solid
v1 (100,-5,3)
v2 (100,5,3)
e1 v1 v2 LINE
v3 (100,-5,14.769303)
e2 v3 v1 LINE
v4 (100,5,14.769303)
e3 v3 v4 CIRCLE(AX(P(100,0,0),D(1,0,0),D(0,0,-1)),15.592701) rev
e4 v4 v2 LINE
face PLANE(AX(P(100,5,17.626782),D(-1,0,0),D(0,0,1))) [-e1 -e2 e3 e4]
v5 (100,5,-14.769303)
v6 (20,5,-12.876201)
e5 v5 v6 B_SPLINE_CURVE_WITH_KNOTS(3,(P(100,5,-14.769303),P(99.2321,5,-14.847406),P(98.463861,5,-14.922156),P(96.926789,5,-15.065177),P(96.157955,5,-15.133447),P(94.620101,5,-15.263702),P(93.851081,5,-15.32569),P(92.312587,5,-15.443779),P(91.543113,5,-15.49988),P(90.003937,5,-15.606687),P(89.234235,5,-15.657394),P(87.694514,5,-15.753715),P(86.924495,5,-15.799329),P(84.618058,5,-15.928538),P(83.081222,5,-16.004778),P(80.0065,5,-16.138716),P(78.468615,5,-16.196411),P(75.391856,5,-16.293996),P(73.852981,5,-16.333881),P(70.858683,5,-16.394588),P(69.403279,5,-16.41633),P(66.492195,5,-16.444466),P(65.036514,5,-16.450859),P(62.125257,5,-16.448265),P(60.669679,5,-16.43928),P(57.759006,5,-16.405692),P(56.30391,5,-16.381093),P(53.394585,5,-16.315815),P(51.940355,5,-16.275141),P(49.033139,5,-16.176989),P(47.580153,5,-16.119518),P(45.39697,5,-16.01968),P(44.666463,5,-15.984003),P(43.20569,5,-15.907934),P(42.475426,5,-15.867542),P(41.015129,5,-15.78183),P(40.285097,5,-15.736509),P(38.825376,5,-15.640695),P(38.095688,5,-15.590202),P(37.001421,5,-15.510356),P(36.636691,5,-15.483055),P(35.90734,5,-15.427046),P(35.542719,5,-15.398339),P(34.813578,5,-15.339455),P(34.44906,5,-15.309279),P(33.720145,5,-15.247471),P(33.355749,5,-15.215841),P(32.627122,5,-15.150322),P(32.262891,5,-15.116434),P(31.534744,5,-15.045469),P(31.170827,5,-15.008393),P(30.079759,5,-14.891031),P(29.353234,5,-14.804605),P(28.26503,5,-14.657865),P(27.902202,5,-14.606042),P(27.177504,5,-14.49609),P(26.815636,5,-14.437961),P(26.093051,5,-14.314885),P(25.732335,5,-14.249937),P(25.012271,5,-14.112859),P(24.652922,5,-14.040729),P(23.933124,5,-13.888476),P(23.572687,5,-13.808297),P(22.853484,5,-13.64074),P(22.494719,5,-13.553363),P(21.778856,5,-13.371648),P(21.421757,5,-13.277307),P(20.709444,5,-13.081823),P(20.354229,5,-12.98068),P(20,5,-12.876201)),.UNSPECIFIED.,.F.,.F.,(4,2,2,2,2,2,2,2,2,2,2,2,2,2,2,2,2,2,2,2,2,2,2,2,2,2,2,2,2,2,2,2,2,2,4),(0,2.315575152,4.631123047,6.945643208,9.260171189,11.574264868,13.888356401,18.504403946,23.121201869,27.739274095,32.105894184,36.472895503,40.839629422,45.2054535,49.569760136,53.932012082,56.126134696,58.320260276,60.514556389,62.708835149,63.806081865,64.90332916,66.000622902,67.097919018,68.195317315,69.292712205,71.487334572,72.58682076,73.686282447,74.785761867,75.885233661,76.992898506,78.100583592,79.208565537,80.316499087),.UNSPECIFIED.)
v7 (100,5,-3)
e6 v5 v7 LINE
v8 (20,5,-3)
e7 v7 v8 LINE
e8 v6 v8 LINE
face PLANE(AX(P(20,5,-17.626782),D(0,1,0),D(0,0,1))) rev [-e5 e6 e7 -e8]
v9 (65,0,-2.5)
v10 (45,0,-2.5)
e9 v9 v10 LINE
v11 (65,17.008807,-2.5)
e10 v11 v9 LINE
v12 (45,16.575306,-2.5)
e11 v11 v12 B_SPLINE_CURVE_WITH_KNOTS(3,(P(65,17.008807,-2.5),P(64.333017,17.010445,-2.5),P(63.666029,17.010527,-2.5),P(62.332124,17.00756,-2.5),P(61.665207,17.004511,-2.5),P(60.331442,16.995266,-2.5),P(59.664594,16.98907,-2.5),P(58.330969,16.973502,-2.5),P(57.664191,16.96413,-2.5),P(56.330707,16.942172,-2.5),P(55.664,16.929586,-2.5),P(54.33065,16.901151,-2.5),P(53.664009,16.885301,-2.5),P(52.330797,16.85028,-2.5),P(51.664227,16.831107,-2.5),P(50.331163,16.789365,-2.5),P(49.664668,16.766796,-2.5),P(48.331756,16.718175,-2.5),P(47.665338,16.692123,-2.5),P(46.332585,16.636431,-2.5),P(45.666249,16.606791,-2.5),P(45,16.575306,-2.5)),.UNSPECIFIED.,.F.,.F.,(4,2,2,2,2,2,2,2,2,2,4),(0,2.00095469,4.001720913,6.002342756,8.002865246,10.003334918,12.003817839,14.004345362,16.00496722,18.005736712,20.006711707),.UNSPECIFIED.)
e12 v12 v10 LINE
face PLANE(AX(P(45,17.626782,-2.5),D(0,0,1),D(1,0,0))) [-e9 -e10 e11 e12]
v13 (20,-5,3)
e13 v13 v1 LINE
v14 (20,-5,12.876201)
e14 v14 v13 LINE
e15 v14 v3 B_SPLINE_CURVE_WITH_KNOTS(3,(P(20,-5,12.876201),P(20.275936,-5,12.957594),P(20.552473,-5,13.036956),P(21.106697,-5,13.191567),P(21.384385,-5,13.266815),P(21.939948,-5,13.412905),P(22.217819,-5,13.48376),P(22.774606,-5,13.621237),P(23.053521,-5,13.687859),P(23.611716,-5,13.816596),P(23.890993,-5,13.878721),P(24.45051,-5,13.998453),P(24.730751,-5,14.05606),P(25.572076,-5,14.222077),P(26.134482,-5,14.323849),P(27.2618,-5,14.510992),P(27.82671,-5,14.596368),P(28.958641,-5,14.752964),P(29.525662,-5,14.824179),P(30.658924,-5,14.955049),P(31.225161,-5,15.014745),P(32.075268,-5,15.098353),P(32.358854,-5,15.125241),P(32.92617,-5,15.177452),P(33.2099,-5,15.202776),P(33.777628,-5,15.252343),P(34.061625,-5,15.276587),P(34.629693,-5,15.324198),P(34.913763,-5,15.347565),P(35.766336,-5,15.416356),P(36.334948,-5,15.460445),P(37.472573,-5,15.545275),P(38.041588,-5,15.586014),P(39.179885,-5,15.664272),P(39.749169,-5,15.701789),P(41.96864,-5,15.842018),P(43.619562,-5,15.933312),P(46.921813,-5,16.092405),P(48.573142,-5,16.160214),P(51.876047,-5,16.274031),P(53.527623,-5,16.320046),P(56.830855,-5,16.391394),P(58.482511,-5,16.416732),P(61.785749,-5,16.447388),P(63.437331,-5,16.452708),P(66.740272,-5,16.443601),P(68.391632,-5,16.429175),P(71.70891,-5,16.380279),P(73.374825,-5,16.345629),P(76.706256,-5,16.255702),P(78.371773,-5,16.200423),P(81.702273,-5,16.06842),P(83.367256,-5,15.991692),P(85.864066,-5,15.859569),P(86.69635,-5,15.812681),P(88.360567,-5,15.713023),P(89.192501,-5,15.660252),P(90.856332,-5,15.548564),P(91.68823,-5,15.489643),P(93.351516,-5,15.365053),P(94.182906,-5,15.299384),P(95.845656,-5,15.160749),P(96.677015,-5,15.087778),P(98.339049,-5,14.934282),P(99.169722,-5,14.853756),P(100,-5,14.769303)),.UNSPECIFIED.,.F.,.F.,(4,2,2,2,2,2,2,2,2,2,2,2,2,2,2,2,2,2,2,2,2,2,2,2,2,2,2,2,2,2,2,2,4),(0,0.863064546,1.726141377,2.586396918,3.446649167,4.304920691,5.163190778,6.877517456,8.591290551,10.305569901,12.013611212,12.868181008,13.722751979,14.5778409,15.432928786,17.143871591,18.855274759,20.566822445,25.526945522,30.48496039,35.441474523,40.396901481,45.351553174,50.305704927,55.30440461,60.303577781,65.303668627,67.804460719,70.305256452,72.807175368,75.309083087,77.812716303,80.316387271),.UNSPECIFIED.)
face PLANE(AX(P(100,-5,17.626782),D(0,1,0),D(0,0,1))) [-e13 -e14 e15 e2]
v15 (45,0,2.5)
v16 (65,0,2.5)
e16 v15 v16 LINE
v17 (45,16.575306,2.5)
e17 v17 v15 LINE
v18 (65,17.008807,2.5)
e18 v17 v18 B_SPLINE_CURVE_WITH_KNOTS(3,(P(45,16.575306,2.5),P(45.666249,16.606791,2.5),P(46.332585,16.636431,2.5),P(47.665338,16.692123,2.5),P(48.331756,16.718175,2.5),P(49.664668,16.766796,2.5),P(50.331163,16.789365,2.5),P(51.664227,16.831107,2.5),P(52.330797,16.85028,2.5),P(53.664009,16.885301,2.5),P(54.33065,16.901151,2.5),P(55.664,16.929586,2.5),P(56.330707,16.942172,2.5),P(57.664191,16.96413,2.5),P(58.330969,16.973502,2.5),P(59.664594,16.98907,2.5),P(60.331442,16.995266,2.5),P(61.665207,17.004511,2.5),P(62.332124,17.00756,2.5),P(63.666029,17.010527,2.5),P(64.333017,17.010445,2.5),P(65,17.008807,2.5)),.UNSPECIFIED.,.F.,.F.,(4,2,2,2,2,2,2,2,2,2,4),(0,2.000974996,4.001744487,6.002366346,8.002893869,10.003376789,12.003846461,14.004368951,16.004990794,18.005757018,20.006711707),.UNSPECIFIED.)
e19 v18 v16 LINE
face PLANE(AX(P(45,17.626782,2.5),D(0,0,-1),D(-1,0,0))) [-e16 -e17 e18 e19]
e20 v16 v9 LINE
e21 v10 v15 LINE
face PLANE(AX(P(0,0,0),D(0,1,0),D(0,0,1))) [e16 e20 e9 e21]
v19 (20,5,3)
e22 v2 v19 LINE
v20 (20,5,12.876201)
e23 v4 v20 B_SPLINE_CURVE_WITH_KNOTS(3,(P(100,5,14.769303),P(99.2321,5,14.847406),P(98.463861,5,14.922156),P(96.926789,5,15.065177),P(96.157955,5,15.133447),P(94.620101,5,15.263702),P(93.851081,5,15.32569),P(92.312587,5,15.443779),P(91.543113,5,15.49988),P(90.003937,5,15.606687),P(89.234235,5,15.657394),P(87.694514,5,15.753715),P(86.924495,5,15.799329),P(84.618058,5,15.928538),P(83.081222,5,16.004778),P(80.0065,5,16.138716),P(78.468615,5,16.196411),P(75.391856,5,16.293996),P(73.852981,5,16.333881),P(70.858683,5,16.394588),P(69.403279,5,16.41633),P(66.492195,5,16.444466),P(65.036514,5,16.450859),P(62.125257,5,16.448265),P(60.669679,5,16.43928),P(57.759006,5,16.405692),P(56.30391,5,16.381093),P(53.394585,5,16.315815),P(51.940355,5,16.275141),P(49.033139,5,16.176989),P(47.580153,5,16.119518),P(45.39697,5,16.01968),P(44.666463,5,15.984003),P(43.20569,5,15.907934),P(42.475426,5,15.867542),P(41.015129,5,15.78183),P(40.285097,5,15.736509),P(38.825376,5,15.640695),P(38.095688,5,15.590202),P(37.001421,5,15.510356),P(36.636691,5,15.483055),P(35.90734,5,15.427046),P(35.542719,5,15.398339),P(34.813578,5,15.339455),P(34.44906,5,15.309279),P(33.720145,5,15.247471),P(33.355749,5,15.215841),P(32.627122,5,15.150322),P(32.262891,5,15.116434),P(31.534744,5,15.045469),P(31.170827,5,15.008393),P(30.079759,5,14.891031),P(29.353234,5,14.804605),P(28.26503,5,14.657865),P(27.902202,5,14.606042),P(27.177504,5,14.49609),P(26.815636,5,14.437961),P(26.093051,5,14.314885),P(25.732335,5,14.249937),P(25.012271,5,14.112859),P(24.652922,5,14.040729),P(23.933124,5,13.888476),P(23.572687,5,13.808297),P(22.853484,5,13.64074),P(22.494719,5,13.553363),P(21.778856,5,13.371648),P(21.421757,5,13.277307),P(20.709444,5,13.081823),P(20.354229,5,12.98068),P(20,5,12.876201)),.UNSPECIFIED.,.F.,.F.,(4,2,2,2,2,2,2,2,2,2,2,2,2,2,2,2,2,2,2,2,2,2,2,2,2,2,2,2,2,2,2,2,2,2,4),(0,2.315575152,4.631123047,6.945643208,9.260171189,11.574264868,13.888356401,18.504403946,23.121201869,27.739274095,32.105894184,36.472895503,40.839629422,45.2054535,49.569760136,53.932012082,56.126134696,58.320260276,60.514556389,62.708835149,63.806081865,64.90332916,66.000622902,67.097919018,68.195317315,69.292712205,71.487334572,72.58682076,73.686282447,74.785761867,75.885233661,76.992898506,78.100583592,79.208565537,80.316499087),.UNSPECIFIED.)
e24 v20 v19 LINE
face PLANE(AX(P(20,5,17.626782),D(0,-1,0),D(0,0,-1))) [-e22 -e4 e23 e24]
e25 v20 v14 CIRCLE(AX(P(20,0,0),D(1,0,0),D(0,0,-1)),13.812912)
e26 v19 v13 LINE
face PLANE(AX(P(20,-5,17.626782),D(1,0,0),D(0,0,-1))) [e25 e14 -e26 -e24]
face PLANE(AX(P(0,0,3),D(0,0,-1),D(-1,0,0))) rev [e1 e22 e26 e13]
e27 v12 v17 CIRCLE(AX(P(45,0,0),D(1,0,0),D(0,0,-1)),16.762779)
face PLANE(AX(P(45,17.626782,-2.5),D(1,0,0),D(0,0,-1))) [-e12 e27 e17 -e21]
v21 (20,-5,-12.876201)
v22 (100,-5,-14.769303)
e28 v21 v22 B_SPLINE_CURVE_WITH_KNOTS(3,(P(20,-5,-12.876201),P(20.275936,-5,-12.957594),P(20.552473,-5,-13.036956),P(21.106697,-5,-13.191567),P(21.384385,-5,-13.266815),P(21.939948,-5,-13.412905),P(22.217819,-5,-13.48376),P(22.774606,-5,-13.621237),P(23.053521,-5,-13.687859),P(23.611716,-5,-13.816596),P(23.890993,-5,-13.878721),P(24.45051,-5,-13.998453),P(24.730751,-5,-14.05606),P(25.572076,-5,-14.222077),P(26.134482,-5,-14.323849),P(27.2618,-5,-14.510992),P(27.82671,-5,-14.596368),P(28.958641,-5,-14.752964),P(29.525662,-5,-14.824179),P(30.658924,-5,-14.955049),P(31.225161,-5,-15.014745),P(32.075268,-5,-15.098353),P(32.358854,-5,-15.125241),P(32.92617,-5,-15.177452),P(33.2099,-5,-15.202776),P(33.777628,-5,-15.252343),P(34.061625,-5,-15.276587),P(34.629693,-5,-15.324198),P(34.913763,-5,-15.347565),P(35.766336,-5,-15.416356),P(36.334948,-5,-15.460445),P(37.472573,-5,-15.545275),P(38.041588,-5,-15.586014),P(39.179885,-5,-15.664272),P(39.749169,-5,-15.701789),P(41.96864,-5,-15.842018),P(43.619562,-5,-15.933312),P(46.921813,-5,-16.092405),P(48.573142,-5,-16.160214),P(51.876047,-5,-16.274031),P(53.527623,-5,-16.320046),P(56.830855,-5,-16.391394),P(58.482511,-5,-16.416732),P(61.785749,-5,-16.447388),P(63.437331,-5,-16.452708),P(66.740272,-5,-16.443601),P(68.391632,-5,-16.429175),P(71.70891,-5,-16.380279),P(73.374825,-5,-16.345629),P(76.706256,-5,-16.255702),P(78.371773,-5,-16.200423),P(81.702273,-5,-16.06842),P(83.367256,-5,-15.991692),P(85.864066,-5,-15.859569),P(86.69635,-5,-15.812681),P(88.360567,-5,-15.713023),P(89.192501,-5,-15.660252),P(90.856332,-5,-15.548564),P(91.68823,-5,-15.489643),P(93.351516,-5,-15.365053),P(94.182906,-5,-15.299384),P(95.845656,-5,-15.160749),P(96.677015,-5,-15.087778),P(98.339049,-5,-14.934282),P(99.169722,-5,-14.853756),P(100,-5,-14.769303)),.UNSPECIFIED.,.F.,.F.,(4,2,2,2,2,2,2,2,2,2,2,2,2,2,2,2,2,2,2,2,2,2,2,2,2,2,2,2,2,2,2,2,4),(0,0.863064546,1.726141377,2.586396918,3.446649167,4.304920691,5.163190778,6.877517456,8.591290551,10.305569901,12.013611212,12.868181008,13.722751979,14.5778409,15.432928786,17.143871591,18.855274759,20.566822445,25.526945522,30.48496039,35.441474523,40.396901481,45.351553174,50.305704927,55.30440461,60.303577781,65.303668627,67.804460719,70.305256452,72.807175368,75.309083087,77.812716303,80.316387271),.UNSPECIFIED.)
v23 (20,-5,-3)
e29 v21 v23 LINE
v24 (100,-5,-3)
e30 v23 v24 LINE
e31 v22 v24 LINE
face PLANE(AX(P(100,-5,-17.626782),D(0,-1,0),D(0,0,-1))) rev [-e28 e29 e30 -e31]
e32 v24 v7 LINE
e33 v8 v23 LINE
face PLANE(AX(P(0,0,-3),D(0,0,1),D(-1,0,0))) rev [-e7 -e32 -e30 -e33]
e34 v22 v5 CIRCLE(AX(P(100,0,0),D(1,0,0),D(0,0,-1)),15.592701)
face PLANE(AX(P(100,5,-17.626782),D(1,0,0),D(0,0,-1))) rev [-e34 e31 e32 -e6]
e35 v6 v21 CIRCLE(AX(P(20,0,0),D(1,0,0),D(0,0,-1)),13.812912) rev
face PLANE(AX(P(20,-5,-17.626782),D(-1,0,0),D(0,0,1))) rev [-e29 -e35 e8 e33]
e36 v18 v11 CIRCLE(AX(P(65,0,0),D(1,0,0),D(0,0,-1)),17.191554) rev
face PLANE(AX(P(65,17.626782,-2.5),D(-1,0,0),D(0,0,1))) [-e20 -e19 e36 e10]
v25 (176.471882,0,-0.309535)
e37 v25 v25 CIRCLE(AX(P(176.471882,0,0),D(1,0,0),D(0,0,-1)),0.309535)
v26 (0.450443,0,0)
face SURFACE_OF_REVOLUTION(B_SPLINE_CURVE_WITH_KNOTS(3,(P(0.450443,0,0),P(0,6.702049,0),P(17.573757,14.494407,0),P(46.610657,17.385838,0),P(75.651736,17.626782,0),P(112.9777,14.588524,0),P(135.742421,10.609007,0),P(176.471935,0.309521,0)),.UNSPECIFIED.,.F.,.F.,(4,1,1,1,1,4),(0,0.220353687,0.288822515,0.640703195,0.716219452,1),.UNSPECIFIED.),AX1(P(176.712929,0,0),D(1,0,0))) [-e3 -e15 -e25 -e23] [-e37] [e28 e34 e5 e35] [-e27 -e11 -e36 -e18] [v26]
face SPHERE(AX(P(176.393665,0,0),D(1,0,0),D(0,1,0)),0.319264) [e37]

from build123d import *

# Parameters (mm, degrees)
ESQUISSE2_W             = 80
ESQUISSE2_H             = 10
ENL_V_MAT_EXTRU_1_DEPTH = 179.691922833
ESQUISSE3_W             = 20
ESQUISSE3_H             = 5
ENL_V_MAT_EXTRU_2_DEPTH = 179.307729192


# Read off the part's stored shape, not the designer's step: Révolution1
with BuildPart() as part:
    # Révolution1 outline → Révolution1 (revolve)
    with BuildSketch(Plane.YX):
        with BuildLine():
            Line((0, 176.471881523), (0, 0.450442526))
            add(Edge.make_bspline(
                [(0, 0.450442526), (0.103361961, 0.443495603), (0.206543876, 0.439844859), (0.309534668, 0.439429886)],
                knots=[0, 0, 0, 0, 0.003398392, 0.003398392, 0.003398392, 0.003398392], degree=3))
            Line((0.309534668, 0.439429886), (0.309534507, 176.471881524))
            Line((0.309534507, 176.471881524), (0, 176.471881523))
        make_face()
        with BuildLine():
            Line((0.309534512, 176.471881525), (0.309534668, 0.439429886))
            add(Edge.make_bspline(
                [(0.309534668, 0.439429886), (6.884526451, 0.412937715), (14.509743766, 17.727772952), (16.667676996, 39.398599443), (17.192832586, 53.387091856), (17.192832592, 63.948829317)],
                knots=[0.003398392, 0.003398392, 0.003398392, 0.003398392, 0.220353687, 0.288822515, 0.48156816, 0.48156816, 0.48156816, 0.48156816], degree=3))
            add(Edge.make_bspline(
                [(17.192832592, 63.948829317), (17.192832597, 72.668831581), (16.803343845, 85.767940858), (14.588524885, 112.977693153), (10.609009478, 135.742405432), (0.309534512, 176.471881525)],
                knots=[0.48156816, 0.48156816, 0.48156816, 0.48156816, 0.640703195, 0.716219452, 0.999999875, 0.999999875, 0.999999875, 0.999999875], degree=3))
        make_face()
        with BuildLine():
            Line((0, 176.712929062), (0, 176.471881523))
            Line((0, 176.471881523), (0.309534507, 176.471881523))
            ThreePointArc((0.309534507, 176.471881523), (0.196160347, 176.645559085), (0, 176.712929062))
        make_face()
    revolve(axis=Axis((0, 0, 0), (1, 0, 0)))

    # Esquisse2 → Enlèv. mat.-Extru.1 (cut, through all)
    with BuildSketch(Plane.XY.offset(3)):
        with Locations((60, 0)):
            Rectangle(ESQUISSE2_W, ESQUISSE2_H)
    enl_v_mat_extru_1 = extrude(amount=ENL_V_MAT_EXTRU_1_DEPTH, mode=Mode.SUBTRACT)

    # Symétrie1: Enlèv. mat.-Extru.1 across plane
    add(enl_v_mat_extru_1.mirror(Plane.XY), mode=Mode.SUBTRACT)

    # Esquisse3 → Enlèv. mat.-Extru.2 (cut, through all)
    with BuildSketch(Plane(origin=(0, 0, 0), x_dir=(1, 0, 0), z_dir=(0, 1, 0))):
        with Locations((55, 0)):
            Rectangle(ESQUISSE3_W, ESQUISSE3_H)
    extrude(amount=ENL_V_MAT_EXTRU_2_DEPTH, mode=Mode.SUBTRACT)


solid = part.part
